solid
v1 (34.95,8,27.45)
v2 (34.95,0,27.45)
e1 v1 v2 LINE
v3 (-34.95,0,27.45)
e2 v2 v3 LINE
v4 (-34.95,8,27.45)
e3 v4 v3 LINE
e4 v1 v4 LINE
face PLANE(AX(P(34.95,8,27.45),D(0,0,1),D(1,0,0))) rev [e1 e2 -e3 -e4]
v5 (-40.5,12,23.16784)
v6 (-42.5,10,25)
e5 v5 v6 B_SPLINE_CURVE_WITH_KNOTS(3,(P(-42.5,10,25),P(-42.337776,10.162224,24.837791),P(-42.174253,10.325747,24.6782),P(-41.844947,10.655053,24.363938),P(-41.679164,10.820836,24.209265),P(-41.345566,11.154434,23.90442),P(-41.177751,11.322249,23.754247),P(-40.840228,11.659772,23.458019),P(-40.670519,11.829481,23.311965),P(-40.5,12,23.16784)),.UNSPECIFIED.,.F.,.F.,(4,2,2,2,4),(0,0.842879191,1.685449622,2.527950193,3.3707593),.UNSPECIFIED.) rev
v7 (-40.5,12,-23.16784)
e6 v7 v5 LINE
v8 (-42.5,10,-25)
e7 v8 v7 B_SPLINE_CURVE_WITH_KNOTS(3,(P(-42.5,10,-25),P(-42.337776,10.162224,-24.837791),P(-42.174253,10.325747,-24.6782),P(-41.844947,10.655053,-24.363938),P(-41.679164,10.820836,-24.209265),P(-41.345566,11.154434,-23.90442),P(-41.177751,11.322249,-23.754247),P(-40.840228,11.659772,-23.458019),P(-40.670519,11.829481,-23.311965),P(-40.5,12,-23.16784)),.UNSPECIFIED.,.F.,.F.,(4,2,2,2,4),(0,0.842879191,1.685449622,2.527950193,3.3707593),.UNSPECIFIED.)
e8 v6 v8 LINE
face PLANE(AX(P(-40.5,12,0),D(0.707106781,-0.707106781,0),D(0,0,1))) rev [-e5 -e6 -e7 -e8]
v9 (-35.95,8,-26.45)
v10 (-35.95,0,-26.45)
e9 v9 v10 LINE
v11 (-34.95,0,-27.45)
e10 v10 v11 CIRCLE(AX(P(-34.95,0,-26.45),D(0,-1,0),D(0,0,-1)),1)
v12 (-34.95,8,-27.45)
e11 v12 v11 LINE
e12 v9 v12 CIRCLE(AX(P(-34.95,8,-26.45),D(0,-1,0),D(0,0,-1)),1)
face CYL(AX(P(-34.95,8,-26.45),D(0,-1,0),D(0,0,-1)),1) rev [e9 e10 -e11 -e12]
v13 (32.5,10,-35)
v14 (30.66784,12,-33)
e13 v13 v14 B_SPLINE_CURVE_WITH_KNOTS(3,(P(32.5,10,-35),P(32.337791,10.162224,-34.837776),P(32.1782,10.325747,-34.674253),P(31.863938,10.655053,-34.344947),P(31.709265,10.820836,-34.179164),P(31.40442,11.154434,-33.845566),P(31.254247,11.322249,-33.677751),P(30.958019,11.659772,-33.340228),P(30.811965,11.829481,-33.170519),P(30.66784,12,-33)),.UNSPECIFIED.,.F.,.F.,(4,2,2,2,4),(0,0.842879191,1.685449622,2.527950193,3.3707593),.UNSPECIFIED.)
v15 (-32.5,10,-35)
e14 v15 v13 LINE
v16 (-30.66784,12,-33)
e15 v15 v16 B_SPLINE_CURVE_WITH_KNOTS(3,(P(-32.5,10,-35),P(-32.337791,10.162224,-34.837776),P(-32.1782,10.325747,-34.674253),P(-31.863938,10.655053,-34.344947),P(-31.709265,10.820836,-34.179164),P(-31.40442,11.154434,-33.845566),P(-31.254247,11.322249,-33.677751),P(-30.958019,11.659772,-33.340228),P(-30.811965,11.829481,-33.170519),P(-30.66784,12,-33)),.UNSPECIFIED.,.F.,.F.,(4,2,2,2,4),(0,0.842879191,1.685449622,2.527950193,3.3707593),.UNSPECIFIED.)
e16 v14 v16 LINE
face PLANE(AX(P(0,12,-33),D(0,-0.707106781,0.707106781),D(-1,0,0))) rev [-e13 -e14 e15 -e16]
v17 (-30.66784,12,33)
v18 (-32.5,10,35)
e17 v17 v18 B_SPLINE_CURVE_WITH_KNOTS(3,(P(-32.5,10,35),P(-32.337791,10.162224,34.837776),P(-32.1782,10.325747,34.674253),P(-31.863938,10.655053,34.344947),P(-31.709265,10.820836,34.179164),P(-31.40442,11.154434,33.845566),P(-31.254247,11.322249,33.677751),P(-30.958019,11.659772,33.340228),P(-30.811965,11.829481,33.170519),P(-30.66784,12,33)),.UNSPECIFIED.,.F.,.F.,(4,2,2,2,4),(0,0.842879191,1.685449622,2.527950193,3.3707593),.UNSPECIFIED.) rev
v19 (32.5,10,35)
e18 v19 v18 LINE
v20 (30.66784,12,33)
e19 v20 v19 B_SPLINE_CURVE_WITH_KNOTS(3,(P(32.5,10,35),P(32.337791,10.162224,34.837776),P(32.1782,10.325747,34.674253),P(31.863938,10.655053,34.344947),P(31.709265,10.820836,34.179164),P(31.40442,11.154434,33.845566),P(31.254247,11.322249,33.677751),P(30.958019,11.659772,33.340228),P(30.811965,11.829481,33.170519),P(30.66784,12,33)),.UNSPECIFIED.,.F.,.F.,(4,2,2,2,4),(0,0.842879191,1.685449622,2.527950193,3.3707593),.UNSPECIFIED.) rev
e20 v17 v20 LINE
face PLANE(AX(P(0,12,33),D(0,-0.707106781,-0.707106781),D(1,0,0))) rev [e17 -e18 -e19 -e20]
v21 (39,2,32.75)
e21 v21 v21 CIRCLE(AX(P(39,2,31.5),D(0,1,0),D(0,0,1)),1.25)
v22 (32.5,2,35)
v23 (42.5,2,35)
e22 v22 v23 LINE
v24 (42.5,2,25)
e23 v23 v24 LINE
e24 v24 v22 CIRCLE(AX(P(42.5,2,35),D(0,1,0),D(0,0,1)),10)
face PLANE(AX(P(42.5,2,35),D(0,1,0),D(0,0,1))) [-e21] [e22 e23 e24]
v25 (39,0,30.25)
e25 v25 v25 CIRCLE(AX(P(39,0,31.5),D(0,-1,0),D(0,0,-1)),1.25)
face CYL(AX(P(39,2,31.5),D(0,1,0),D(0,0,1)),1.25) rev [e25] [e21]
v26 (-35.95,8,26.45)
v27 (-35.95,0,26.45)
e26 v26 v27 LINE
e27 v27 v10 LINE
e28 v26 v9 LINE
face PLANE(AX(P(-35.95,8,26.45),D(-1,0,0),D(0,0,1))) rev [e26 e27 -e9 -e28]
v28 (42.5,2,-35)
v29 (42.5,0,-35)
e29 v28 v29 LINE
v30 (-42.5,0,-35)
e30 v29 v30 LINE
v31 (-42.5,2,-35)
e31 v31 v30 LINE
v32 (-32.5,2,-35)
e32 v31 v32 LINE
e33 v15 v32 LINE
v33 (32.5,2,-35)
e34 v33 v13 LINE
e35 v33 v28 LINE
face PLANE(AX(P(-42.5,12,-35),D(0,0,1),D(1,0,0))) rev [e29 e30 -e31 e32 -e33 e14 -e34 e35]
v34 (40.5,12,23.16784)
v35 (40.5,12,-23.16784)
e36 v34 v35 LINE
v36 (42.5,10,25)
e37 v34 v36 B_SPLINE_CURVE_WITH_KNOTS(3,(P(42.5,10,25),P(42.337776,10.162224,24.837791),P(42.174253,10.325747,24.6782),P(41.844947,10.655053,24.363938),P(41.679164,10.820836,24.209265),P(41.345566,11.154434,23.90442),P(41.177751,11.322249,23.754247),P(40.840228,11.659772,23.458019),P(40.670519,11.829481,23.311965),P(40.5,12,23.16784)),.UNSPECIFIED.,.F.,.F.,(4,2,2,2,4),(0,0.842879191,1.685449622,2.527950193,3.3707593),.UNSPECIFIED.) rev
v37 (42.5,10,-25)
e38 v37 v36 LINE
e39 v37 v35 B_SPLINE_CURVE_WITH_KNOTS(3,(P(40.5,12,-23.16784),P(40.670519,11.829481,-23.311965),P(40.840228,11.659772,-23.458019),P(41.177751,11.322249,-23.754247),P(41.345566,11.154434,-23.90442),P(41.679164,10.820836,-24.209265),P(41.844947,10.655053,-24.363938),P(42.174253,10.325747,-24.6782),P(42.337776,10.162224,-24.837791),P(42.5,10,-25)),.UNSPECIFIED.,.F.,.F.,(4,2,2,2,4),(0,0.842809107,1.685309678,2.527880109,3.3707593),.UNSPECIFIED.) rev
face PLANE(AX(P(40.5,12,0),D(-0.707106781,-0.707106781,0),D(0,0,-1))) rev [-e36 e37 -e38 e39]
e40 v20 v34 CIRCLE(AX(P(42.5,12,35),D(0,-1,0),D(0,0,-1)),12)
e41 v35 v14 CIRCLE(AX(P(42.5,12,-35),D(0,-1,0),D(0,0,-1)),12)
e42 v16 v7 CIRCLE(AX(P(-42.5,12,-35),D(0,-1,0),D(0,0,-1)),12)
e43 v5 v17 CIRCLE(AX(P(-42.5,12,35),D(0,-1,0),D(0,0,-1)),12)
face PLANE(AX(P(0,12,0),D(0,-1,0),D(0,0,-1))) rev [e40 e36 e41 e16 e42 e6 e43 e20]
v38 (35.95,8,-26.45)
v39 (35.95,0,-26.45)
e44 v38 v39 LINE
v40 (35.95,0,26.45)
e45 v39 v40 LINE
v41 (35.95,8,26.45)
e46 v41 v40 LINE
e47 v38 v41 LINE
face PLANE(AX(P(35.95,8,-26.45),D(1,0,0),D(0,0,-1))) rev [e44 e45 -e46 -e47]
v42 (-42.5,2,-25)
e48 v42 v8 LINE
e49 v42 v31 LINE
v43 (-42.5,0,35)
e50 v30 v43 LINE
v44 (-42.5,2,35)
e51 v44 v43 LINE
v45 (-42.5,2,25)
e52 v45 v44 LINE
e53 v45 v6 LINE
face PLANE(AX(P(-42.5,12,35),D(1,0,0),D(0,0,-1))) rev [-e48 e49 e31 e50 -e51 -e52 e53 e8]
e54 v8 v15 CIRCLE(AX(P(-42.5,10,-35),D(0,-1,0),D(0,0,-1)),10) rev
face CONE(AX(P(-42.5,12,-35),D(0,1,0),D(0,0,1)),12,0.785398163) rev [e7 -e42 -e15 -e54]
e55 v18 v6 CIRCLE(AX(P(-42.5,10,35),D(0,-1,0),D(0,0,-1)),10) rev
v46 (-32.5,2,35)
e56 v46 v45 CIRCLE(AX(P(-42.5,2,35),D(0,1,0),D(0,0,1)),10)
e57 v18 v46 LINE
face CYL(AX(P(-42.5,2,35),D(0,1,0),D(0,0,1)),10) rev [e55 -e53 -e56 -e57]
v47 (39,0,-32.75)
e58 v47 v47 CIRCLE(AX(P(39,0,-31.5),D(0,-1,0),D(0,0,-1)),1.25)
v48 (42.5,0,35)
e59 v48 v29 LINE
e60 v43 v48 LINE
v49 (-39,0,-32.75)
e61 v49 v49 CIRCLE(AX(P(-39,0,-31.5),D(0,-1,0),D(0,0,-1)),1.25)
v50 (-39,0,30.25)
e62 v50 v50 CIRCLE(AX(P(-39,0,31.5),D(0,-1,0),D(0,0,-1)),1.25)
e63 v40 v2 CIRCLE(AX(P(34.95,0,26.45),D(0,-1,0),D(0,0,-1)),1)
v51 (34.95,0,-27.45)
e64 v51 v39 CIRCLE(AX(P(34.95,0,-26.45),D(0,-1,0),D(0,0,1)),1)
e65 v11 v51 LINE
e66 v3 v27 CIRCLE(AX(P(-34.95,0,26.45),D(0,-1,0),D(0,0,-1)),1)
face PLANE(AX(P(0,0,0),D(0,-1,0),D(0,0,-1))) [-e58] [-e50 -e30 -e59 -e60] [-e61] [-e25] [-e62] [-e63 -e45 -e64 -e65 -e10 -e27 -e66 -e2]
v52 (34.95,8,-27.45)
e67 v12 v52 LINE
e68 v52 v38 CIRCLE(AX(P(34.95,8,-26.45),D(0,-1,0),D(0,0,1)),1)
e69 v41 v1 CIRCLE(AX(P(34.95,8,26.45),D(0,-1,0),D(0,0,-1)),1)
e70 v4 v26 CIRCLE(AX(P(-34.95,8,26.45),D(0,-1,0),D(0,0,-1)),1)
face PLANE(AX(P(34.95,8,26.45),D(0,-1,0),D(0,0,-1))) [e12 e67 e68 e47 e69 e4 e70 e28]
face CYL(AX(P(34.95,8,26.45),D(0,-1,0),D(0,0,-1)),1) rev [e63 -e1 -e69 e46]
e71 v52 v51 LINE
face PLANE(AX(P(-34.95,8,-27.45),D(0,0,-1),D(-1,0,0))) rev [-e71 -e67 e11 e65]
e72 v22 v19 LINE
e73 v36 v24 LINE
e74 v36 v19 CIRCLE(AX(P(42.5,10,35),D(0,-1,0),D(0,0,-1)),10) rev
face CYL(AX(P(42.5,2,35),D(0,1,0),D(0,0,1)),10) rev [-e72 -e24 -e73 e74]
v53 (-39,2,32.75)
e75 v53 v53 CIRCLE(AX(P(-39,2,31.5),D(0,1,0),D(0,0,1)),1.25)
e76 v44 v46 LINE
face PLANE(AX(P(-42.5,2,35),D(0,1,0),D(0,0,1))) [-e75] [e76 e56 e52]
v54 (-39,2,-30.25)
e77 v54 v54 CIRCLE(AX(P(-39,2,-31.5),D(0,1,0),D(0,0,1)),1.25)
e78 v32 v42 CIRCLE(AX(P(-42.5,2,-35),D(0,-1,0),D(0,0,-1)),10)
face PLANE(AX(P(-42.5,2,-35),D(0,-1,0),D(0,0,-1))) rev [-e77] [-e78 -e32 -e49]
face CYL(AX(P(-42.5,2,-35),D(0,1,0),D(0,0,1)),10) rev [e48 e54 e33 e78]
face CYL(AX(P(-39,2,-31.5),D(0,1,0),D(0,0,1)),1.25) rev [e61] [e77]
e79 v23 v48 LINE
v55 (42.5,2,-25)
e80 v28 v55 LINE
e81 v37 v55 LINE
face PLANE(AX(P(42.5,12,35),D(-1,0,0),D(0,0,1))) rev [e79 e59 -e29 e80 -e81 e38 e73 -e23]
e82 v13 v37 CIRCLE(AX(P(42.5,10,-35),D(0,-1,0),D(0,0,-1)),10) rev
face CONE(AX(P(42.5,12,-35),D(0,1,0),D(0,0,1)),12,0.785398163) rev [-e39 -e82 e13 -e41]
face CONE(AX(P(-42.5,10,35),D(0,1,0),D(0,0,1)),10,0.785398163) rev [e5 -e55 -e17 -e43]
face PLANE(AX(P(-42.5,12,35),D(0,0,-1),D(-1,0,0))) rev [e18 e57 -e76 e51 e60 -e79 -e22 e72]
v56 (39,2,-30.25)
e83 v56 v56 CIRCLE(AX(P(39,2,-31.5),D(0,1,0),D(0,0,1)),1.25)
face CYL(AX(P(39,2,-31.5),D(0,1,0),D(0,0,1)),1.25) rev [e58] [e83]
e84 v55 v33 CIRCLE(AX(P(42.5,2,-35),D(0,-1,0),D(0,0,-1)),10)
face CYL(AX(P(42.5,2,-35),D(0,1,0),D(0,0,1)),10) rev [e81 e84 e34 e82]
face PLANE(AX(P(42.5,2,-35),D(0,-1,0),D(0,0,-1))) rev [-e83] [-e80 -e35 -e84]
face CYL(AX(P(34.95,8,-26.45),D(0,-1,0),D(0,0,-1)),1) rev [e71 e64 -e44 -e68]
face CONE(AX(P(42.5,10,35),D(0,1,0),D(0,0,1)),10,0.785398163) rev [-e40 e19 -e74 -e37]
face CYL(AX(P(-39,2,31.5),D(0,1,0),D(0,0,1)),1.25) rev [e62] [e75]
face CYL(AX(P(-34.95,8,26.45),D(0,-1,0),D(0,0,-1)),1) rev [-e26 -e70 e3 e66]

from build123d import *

# Parameters (mm, degrees)
SKETCH2_W                 = 85
SKETCH2_H                 = 70
BOSS_EXTRUDE1_DEPTH       = 12
SKETCH4_R                 = 10
CUT_EXTRUDE3_DEPTH        = 10
FILLET2_SIZE              = 2
M3X0_5_TAPPED_HOLE1_D     = 2.5
M3X0_5_TAPPED_HOLE1_DEPTH = 10
M3X0_5_TAPPED_HOLE1_TIP   = 0.751075774
CUT_EXTRUDE4_DEPTH        = 8


with BuildPart() as part:
    # Sketch2 → Boss-Extrude1 (new body)
    with BuildSketch(Plane(origin=(0, 0, 0), x_dir=(1, 0, 0), z_dir=(0, 1, 0))):
        Rectangle(SKETCH2_W, SKETCH2_H)
    extrude(amount=BOSS_EXTRUDE1_DEPTH)

    # Sketch4 → Cut-Extrude3 (cut)
    with BuildSketch(Plane(origin=(0, 12, 0), x_dir=(1, 0, 0), z_dir=(0, 1, 0))):
        with Locations((42.5, -35)):
            Circle(SKETCH4_R)
        with Locations((-42.5, -35)):
            Circle(SKETCH4_R)
        with Locations((-42.5, 35)):
            Circle(SKETCH4_R)
        with Locations((42.5, 35)):
            Circle(SKETCH4_R)
    extrude(amount=-CUT_EXTRUDE3_DEPTH, mode=Mode.SUBTRACT)

    # Fillet2
    fillet2_edges = [part.edges().sort_by_distance(p)[0] for p in [
        (42.5, 12, 0),
        (0, 12, -35),
        (-42.5, 12, 0),
        (0, 12, 35),
        (35.428932188, 12, -27.928932188),
        (-35.428932188, 12, -27.928932188),
        (-35.428932188, 12, 27.928932188),
        (35.428932188, 12, 27.928932188),
    ]]
    chamfer(fillet2_edges, length=FILLET2_SIZE)

    # M3x0.5 Tapped Hole1
    with Locations(Plane(origin=(0, 2, 0), x_dir=(1, 0, 0), z_dir=(0, 1, 0))):
        with Locations((-39, 31.5), (-39, -31.5), (39, -31.5), (39, 31.5)):
            Hole(M3X0_5_TAPPED_HOLE1_D / 2, depth=M3X0_5_TAPPED_HOLE1_DEPTH)
            with Locations((0, 0, -(M3X0_5_TAPPED_HOLE1_DEPTH + M3X0_5_TAPPED_HOLE1_TIP / 2))):  # 118° drill point
                Cone(0, M3X0_5_TAPPED_HOLE1_D / 2, M3X0_5_TAPPED_HOLE1_TIP, mode=Mode.SUBTRACT)

    # Sketch8 → Cut-Extrude4 (cut)
    with BuildSketch(Plane.XZ):
        with BuildLine():
            Line((35.95, -26.45), (35.95, 26.45))
            ThreePointArc((35.95, 26.45), (35.657106781, 27.157106781), (34.95, 27.45))
            Line((34.95, 27.45), (-34.95, 27.45))
            ThreePointArc((-34.95, 27.45), (-35.657106781, 27.157106781), (-35.95, 26.45))
            Line((-35.95, 26.45), (-35.95, -26.45))
            ThreePointArc((-35.95, -26.45), (-35.657106781, -27.157106781), (-34.95, -27.45))
            Line((-34.95, -27.45), (34.95, -27.45))
            ThreePointArc((34.95, -27.45), (35.657106781, -27.157106781), (35.95, -26.45))
        make_face()
    extrude(amount=-CUT_EXTRUDE4_DEPTH, mode=Mode.SUBTRACT)


solid = part.part
